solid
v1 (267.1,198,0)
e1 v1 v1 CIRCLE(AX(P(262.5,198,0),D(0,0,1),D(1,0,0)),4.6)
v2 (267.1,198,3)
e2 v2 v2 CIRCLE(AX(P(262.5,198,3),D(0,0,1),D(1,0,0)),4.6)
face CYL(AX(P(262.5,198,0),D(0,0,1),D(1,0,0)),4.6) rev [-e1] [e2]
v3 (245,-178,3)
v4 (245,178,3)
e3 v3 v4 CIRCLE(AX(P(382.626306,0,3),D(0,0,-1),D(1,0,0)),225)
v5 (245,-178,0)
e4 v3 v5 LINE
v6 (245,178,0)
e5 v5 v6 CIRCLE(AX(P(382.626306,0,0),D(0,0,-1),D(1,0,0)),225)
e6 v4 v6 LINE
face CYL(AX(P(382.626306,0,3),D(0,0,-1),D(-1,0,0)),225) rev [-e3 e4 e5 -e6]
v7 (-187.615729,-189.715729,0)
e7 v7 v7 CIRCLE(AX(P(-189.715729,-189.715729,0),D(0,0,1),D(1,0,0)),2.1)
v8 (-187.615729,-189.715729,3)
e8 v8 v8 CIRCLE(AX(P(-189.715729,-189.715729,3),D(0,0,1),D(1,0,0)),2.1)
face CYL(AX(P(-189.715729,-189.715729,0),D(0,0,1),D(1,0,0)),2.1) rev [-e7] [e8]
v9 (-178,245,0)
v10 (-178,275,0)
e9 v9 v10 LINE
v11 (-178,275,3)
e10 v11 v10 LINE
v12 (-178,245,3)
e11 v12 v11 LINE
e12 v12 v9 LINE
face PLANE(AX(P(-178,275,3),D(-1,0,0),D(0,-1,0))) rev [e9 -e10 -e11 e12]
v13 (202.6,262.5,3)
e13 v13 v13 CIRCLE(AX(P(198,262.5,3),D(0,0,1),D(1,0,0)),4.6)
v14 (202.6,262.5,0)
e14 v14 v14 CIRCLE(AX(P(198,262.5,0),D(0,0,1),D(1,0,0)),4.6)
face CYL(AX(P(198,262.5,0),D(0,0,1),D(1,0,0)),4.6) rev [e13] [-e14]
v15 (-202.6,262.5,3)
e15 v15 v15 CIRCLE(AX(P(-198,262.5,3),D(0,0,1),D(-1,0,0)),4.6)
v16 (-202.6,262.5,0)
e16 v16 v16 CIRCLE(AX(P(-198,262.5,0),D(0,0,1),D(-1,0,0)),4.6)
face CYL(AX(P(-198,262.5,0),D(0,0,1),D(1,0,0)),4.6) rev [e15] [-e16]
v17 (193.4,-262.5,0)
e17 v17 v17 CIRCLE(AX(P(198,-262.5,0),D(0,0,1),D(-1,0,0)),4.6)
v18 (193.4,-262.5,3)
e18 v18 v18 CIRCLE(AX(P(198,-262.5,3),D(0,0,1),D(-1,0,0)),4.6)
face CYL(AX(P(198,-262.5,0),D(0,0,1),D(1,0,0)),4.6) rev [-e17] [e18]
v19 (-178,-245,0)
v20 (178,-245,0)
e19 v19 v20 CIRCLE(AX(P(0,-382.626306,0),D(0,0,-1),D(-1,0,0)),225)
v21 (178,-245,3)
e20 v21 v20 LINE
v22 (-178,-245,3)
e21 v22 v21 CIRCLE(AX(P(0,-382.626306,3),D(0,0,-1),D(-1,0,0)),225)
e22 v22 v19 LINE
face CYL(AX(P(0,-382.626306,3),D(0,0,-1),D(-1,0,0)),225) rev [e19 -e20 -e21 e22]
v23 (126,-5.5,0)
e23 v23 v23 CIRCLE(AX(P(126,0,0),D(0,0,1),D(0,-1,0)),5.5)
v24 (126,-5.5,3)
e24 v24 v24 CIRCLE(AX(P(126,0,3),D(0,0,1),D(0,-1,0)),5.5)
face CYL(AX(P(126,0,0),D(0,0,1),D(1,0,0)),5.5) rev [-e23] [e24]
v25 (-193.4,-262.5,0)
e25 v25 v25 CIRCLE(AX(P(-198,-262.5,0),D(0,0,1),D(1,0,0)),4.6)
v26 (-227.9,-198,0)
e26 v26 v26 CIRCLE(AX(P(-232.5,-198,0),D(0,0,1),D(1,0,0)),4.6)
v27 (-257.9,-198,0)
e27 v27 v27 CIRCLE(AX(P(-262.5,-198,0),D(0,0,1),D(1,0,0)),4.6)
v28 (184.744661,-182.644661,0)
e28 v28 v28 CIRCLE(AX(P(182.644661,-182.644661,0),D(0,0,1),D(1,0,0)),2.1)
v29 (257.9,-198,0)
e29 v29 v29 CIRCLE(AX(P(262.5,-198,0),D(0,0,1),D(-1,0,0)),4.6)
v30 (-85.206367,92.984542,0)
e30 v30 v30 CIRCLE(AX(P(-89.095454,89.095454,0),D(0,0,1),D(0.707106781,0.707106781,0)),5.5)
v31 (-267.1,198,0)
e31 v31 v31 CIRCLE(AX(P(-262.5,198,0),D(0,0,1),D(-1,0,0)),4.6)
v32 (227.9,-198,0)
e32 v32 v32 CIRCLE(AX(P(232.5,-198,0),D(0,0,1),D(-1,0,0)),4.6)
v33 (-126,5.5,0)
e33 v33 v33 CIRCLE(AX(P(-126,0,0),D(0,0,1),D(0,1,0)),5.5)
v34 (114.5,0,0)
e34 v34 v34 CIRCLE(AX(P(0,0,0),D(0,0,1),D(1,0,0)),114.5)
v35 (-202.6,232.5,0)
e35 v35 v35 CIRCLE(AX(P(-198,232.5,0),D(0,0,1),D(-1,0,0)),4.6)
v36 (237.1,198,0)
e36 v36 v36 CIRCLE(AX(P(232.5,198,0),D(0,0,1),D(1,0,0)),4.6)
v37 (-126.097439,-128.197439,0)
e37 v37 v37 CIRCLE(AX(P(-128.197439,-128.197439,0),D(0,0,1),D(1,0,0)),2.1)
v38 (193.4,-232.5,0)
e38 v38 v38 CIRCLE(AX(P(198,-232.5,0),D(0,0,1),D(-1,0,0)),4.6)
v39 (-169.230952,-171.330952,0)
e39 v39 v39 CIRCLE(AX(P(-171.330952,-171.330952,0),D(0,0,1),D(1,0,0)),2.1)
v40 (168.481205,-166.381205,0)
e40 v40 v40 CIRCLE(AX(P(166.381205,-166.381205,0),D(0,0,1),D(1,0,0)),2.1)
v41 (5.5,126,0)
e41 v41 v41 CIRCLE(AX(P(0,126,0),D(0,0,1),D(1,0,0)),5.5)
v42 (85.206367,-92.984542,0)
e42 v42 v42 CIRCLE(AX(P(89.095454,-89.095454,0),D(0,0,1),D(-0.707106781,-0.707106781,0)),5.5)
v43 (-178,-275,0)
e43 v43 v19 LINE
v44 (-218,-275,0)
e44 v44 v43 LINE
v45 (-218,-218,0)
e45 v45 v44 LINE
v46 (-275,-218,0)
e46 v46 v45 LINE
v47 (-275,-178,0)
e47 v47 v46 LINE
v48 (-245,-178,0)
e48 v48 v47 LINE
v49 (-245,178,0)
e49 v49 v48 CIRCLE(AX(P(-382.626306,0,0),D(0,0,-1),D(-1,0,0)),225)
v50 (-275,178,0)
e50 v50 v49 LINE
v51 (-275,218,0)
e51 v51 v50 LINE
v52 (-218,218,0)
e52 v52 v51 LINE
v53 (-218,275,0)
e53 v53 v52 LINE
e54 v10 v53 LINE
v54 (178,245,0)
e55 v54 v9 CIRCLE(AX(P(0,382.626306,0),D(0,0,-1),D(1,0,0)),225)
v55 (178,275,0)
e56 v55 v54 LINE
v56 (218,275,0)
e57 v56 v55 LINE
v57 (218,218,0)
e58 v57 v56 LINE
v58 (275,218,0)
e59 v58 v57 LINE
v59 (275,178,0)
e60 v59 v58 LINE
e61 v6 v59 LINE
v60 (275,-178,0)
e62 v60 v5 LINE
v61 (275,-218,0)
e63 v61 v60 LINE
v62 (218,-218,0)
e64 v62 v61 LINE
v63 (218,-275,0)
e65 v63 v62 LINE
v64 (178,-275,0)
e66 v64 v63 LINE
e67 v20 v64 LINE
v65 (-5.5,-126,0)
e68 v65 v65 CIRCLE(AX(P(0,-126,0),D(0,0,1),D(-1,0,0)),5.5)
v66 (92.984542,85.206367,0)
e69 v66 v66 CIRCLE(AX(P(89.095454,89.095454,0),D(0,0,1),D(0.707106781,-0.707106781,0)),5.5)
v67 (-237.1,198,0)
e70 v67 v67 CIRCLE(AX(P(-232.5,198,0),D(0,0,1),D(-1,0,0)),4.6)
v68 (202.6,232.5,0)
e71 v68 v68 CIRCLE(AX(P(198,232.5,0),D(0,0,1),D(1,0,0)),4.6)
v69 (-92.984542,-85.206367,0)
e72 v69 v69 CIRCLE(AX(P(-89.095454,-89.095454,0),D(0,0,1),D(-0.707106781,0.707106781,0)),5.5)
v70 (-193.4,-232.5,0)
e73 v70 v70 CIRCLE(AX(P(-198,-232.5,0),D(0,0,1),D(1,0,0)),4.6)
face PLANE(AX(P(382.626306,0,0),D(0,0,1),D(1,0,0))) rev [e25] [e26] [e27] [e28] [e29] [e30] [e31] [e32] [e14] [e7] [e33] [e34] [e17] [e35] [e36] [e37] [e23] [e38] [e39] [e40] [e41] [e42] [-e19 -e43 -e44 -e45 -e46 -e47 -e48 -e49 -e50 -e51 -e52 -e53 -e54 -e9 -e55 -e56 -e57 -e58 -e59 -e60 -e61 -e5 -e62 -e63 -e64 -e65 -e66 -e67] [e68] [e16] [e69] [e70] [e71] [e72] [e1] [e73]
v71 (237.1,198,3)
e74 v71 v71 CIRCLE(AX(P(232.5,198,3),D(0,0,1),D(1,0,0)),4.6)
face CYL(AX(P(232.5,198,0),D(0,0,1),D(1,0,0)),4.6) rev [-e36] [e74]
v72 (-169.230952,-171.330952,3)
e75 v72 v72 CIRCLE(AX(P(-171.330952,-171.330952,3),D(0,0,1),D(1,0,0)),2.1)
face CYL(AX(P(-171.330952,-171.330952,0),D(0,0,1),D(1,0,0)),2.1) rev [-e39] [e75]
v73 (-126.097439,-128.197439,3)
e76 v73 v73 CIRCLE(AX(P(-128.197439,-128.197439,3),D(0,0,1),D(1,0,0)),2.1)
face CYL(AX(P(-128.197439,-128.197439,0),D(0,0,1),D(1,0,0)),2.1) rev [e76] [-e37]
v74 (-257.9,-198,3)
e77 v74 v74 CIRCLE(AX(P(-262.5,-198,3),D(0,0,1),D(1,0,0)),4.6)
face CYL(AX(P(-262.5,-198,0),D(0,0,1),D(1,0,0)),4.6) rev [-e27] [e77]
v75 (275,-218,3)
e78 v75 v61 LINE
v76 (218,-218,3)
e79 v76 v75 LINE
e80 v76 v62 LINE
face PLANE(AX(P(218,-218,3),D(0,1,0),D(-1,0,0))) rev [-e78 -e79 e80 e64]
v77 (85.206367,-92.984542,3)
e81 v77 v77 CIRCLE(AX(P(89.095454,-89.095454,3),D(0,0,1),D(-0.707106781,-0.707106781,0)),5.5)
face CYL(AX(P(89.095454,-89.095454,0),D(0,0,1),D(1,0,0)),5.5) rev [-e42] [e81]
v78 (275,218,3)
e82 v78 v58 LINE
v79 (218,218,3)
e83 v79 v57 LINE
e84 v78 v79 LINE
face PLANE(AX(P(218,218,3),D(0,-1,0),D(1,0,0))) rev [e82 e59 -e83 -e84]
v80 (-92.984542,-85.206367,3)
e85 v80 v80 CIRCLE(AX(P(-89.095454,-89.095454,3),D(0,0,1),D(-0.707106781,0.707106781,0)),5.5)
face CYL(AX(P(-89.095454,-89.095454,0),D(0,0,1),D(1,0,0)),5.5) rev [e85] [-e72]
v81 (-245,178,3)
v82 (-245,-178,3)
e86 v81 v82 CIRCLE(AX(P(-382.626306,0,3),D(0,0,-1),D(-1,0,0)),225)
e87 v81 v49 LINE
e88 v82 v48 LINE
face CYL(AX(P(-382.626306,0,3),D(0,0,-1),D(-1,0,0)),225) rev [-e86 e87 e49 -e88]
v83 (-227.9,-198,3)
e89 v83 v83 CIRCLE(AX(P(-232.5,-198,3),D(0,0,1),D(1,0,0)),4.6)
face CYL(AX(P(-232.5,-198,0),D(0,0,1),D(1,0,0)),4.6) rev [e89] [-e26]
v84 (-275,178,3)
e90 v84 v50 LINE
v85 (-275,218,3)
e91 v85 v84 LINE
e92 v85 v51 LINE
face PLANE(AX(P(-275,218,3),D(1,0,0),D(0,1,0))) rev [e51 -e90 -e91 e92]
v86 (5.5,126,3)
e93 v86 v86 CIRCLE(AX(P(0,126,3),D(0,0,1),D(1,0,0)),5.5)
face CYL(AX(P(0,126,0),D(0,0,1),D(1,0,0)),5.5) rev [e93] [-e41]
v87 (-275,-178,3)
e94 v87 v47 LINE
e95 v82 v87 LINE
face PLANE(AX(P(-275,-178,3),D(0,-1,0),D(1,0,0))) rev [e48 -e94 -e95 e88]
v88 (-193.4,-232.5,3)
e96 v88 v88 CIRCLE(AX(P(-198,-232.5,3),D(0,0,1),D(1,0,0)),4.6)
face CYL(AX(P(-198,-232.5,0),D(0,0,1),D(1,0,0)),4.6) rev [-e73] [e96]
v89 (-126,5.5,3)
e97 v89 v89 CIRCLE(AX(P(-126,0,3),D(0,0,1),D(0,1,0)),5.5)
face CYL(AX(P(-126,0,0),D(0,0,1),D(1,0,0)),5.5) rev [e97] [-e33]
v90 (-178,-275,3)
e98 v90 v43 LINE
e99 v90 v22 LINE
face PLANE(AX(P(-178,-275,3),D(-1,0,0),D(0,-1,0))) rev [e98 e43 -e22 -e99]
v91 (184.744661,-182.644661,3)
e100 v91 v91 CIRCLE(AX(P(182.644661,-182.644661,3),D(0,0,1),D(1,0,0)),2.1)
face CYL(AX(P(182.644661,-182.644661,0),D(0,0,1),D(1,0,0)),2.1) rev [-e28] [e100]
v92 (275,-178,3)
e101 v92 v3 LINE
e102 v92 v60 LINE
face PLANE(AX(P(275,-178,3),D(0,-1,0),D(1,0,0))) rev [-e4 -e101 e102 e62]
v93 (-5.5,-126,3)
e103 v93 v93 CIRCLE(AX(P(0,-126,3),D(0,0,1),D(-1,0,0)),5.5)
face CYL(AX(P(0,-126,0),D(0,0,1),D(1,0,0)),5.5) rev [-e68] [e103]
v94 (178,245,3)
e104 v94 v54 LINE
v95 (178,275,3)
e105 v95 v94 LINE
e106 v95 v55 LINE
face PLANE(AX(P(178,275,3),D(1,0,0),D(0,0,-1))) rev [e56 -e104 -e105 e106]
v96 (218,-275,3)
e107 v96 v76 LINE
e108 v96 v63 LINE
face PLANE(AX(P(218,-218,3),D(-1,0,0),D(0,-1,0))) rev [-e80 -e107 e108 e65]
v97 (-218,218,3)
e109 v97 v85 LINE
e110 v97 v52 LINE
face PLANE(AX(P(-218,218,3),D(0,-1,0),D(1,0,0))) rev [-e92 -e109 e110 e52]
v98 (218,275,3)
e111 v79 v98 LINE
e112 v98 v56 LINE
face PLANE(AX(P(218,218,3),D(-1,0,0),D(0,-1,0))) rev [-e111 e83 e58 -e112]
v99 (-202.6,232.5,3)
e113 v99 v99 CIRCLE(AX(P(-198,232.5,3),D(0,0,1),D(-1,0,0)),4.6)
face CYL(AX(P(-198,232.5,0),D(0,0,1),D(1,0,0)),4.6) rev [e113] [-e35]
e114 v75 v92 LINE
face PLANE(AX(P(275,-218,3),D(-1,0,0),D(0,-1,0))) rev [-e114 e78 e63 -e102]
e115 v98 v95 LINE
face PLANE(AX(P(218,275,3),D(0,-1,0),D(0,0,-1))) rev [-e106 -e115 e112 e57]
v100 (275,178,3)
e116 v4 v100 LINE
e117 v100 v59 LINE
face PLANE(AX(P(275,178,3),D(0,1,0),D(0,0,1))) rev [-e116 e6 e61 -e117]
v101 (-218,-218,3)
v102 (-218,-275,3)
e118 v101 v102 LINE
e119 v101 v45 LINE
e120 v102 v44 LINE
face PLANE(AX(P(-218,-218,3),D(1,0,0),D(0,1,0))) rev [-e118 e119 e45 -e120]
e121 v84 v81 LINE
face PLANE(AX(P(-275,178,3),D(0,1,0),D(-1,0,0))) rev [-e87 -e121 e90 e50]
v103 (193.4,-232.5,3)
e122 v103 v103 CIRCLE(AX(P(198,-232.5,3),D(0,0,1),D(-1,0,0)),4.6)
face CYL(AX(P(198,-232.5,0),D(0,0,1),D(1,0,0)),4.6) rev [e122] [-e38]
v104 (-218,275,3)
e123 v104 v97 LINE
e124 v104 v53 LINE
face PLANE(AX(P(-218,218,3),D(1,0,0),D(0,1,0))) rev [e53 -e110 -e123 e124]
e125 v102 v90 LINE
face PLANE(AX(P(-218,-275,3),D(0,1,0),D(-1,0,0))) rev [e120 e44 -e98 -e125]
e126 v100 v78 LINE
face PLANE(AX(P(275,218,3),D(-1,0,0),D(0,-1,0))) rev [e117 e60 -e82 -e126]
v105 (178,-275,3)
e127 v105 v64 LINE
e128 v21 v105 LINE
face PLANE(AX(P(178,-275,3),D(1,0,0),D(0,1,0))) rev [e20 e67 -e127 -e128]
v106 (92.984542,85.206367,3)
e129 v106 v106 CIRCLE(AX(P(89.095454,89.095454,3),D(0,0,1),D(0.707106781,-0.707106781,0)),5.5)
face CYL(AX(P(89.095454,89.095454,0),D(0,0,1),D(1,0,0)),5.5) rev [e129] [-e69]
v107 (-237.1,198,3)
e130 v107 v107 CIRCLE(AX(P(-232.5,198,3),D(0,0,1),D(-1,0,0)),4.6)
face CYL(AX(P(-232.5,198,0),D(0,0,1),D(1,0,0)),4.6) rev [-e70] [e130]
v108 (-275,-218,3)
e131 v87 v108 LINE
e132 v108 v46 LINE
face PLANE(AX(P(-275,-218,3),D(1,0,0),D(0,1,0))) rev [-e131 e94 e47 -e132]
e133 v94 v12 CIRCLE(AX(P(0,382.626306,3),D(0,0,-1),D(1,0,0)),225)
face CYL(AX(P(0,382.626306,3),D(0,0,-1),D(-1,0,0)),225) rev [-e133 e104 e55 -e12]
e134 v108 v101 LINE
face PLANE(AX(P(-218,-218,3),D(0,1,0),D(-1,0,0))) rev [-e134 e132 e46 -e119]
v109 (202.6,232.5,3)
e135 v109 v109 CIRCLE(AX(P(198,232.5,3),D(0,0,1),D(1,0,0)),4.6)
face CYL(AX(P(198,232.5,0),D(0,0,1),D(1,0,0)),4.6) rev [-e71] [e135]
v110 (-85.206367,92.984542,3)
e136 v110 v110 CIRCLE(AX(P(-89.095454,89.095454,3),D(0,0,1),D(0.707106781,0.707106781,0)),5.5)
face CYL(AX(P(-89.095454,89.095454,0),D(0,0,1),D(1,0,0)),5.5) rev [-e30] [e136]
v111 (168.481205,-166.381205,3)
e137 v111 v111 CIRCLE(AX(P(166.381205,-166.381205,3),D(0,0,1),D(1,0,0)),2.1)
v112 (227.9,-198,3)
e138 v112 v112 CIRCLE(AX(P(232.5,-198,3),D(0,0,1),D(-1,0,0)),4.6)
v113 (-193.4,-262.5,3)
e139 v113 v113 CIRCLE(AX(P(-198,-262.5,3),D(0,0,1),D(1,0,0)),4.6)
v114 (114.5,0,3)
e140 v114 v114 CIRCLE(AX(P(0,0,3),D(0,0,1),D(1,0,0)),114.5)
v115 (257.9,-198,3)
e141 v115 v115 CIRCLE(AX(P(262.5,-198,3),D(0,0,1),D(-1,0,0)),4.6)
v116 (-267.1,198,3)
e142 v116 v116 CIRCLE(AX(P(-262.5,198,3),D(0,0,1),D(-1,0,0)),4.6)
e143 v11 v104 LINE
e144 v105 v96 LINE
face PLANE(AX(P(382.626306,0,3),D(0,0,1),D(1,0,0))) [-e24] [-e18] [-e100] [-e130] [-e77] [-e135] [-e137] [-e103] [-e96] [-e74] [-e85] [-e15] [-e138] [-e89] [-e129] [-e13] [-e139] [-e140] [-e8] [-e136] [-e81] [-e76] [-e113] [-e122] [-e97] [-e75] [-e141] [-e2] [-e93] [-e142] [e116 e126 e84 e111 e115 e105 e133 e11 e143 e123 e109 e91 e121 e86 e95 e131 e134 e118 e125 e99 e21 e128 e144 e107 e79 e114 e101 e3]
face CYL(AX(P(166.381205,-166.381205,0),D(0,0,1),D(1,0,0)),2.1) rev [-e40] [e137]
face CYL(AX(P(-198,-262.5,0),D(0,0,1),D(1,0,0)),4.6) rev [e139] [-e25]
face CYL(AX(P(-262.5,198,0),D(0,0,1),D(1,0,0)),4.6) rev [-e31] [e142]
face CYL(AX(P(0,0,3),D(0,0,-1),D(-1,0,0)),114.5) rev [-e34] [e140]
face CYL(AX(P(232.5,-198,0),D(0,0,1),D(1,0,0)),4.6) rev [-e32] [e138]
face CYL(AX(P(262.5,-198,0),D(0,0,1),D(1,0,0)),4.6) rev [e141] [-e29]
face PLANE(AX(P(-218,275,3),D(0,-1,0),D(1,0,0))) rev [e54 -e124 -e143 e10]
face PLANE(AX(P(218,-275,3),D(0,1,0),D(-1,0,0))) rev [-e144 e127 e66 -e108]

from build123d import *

# Parameters (mm, degrees)
SKETCH1_R          = 114.5
BASE_FLANGE1_DEPTH = 3
SKETCH2_R          = 4.6
EXTRUDE1_DEPTH     = 3
SKETCH3_R          = 5.5
EXTRUDE2_DEPTH     = 3
CIRPATTERN1_COUNT  = 8
SKETCH4_R          = 2.1
CUT_EXTRUDE1_DEPTH = 10


# Sheet-metal steps are written as plain solids
with BuildPart() as part:
    # Sketch1 → Base-Flange1 (new body)
    with BuildSketch(Plane.XY):
        with BuildLine():
            Line((218, 218), (218, 275))
            Line((218, 275), (178, 275))
            Line((178, 275), (178, 245))
            ThreePointArc((178, 245), (0, 157.626305625), (-178, 245))
            Line((-178, 245), (-178, 275))
            Line((-178, 275), (-218, 275))
            Line((-218, 275), (-218, 218))
            Line((-218, 218), (-275, 218))
            Line((-275, 218), (-275, 178))
            Line((-275, 178), (-245, 178))
            ThreePointArc((-245, 178), (-157.626305625, 0), (-245, -178))
            Line((-245, -178), (-275, -178))
            Line((-275, -178), (-275, -218))
            Line((-275, -218), (-218, -218))
            Line((-218, -218), (-218, -275))
            Line((-218, -275), (-178, -275))
            Line((-178, -275), (-178, -245))
            ThreePointArc((-178, -245), (0, -157.626305625), (178, -245))
            Line((178, -245), (178, -275))
            Line((178, -275), (218, -275))
            Line((218, -275), (218, -218))
            Line((218, -218), (275, -218))
            Line((275, -218), (275, -178))
            Line((275, -178), (245, -178))
            ThreePointArc((245, -178), (157.626305625, 0), (245, 178))
            Line((245, 178), (275, 178))
            Line((275, 178), (275, 218))
            Line((275, 218), (218, 218))
        make_face()
        Circle(SKETCH1_R, mode=Mode.SUBTRACT)
    extrude(amount=BASE_FLANGE1_DEPTH)

    # Sketch2 → Extrude1 (cut)
    with BuildSketch(Plane.XY.offset(3)):
        with Locations((198, 262.5)):
            Circle(SKETCH2_R)
        with Locations((198, 232.5)):
            Circle(SKETCH2_R)
        with Locations((232.5, 198)):
            Circle(SKETCH2_R)
        with Locations((262.5, 198)):
            Circle(SKETCH2_R)
        with Locations(Location((262.5, -198, 0), (0, 0, 180))):
            Circle(SKETCH2_R)
        with Locations(Location((232.5, -198, 0), (0, 0, 180))):
            Circle(SKETCH2_R)
        with Locations(Location((198, -232.5, 0), (0, 0, 180))):
            Circle(SKETCH2_R)
        with Locations(Location((198, -262.5, 0), (0, 0, 180))):
            Circle(SKETCH2_R)
        with Locations((-198, -262.5)):
            Circle(SKETCH2_R)
        with Locations((-198, -232.5)):
            Circle(SKETCH2_R)
        with Locations((-232.5, -198)):
            Circle(SKETCH2_R)
        with Locations((-262.5, -198)):
            Circle(SKETCH2_R)
        with Locations(Location((-262.5, 198, 0), (0, 0, 180))):
            Circle(SKETCH2_R)
        with Locations(Location((-232.5, 198, 0), (0, 0, 180))):
            Circle(SKETCH2_R)
        with Locations(Location((-198, 232.5, 0), (0, 0, 180))):
            Circle(SKETCH2_R)
        with Locations(Location((-198, 262.5, 0), (0, 0, 180))):
            Circle(SKETCH2_R)
    extrude(amount=-EXTRUDE1_DEPTH, mode=Mode.SUBTRACT)

    # Sketch3 → Extrude2 (cut)
    with BuildSketch(Plane.XY.offset(3)):
        with Locations((0, 126)):
            Circle(SKETCH3_R)
    extrude2 = extrude(amount=-EXTRUDE2_DEPTH, mode=Mode.SUBTRACT)

    # CirPattern1: Extrude2 ×8 about axis
    cirpattern1_axis = Axis((0, 0, 0), (0, 0, 1))
    for i in range(1, CIRPATTERN1_COUNT):
        add(extrude2.rotate(cirpattern1_axis, i * 360 / CIRPATTERN1_COUNT), mode=Mode.SUBTRACT)

    # Sketch4 → Cut-Extrude1 (cut)
    with BuildSketch(Plane.XY.offset(3)):
        with Locations((-189.715728753, -189.715728753)):
            Circle(SKETCH4_R)
        with Locations((-171.330952442, -171.330952442)):
            Circle(SKETCH4_R)
        with Locations((-128.197438789, -128.197438789)):
            Circle(SKETCH4_R)
        with Locations((166.381204973, -166.381204973)):
            Circle(SKETCH4_R)
        with Locations((182.644660941, -182.644660941)):
            Circle(SKETCH4_R)
    extrude(amount=-CUT_EXTRUDE1_DEPTH, mode=Mode.SUBTRACT)


solid = part.part
